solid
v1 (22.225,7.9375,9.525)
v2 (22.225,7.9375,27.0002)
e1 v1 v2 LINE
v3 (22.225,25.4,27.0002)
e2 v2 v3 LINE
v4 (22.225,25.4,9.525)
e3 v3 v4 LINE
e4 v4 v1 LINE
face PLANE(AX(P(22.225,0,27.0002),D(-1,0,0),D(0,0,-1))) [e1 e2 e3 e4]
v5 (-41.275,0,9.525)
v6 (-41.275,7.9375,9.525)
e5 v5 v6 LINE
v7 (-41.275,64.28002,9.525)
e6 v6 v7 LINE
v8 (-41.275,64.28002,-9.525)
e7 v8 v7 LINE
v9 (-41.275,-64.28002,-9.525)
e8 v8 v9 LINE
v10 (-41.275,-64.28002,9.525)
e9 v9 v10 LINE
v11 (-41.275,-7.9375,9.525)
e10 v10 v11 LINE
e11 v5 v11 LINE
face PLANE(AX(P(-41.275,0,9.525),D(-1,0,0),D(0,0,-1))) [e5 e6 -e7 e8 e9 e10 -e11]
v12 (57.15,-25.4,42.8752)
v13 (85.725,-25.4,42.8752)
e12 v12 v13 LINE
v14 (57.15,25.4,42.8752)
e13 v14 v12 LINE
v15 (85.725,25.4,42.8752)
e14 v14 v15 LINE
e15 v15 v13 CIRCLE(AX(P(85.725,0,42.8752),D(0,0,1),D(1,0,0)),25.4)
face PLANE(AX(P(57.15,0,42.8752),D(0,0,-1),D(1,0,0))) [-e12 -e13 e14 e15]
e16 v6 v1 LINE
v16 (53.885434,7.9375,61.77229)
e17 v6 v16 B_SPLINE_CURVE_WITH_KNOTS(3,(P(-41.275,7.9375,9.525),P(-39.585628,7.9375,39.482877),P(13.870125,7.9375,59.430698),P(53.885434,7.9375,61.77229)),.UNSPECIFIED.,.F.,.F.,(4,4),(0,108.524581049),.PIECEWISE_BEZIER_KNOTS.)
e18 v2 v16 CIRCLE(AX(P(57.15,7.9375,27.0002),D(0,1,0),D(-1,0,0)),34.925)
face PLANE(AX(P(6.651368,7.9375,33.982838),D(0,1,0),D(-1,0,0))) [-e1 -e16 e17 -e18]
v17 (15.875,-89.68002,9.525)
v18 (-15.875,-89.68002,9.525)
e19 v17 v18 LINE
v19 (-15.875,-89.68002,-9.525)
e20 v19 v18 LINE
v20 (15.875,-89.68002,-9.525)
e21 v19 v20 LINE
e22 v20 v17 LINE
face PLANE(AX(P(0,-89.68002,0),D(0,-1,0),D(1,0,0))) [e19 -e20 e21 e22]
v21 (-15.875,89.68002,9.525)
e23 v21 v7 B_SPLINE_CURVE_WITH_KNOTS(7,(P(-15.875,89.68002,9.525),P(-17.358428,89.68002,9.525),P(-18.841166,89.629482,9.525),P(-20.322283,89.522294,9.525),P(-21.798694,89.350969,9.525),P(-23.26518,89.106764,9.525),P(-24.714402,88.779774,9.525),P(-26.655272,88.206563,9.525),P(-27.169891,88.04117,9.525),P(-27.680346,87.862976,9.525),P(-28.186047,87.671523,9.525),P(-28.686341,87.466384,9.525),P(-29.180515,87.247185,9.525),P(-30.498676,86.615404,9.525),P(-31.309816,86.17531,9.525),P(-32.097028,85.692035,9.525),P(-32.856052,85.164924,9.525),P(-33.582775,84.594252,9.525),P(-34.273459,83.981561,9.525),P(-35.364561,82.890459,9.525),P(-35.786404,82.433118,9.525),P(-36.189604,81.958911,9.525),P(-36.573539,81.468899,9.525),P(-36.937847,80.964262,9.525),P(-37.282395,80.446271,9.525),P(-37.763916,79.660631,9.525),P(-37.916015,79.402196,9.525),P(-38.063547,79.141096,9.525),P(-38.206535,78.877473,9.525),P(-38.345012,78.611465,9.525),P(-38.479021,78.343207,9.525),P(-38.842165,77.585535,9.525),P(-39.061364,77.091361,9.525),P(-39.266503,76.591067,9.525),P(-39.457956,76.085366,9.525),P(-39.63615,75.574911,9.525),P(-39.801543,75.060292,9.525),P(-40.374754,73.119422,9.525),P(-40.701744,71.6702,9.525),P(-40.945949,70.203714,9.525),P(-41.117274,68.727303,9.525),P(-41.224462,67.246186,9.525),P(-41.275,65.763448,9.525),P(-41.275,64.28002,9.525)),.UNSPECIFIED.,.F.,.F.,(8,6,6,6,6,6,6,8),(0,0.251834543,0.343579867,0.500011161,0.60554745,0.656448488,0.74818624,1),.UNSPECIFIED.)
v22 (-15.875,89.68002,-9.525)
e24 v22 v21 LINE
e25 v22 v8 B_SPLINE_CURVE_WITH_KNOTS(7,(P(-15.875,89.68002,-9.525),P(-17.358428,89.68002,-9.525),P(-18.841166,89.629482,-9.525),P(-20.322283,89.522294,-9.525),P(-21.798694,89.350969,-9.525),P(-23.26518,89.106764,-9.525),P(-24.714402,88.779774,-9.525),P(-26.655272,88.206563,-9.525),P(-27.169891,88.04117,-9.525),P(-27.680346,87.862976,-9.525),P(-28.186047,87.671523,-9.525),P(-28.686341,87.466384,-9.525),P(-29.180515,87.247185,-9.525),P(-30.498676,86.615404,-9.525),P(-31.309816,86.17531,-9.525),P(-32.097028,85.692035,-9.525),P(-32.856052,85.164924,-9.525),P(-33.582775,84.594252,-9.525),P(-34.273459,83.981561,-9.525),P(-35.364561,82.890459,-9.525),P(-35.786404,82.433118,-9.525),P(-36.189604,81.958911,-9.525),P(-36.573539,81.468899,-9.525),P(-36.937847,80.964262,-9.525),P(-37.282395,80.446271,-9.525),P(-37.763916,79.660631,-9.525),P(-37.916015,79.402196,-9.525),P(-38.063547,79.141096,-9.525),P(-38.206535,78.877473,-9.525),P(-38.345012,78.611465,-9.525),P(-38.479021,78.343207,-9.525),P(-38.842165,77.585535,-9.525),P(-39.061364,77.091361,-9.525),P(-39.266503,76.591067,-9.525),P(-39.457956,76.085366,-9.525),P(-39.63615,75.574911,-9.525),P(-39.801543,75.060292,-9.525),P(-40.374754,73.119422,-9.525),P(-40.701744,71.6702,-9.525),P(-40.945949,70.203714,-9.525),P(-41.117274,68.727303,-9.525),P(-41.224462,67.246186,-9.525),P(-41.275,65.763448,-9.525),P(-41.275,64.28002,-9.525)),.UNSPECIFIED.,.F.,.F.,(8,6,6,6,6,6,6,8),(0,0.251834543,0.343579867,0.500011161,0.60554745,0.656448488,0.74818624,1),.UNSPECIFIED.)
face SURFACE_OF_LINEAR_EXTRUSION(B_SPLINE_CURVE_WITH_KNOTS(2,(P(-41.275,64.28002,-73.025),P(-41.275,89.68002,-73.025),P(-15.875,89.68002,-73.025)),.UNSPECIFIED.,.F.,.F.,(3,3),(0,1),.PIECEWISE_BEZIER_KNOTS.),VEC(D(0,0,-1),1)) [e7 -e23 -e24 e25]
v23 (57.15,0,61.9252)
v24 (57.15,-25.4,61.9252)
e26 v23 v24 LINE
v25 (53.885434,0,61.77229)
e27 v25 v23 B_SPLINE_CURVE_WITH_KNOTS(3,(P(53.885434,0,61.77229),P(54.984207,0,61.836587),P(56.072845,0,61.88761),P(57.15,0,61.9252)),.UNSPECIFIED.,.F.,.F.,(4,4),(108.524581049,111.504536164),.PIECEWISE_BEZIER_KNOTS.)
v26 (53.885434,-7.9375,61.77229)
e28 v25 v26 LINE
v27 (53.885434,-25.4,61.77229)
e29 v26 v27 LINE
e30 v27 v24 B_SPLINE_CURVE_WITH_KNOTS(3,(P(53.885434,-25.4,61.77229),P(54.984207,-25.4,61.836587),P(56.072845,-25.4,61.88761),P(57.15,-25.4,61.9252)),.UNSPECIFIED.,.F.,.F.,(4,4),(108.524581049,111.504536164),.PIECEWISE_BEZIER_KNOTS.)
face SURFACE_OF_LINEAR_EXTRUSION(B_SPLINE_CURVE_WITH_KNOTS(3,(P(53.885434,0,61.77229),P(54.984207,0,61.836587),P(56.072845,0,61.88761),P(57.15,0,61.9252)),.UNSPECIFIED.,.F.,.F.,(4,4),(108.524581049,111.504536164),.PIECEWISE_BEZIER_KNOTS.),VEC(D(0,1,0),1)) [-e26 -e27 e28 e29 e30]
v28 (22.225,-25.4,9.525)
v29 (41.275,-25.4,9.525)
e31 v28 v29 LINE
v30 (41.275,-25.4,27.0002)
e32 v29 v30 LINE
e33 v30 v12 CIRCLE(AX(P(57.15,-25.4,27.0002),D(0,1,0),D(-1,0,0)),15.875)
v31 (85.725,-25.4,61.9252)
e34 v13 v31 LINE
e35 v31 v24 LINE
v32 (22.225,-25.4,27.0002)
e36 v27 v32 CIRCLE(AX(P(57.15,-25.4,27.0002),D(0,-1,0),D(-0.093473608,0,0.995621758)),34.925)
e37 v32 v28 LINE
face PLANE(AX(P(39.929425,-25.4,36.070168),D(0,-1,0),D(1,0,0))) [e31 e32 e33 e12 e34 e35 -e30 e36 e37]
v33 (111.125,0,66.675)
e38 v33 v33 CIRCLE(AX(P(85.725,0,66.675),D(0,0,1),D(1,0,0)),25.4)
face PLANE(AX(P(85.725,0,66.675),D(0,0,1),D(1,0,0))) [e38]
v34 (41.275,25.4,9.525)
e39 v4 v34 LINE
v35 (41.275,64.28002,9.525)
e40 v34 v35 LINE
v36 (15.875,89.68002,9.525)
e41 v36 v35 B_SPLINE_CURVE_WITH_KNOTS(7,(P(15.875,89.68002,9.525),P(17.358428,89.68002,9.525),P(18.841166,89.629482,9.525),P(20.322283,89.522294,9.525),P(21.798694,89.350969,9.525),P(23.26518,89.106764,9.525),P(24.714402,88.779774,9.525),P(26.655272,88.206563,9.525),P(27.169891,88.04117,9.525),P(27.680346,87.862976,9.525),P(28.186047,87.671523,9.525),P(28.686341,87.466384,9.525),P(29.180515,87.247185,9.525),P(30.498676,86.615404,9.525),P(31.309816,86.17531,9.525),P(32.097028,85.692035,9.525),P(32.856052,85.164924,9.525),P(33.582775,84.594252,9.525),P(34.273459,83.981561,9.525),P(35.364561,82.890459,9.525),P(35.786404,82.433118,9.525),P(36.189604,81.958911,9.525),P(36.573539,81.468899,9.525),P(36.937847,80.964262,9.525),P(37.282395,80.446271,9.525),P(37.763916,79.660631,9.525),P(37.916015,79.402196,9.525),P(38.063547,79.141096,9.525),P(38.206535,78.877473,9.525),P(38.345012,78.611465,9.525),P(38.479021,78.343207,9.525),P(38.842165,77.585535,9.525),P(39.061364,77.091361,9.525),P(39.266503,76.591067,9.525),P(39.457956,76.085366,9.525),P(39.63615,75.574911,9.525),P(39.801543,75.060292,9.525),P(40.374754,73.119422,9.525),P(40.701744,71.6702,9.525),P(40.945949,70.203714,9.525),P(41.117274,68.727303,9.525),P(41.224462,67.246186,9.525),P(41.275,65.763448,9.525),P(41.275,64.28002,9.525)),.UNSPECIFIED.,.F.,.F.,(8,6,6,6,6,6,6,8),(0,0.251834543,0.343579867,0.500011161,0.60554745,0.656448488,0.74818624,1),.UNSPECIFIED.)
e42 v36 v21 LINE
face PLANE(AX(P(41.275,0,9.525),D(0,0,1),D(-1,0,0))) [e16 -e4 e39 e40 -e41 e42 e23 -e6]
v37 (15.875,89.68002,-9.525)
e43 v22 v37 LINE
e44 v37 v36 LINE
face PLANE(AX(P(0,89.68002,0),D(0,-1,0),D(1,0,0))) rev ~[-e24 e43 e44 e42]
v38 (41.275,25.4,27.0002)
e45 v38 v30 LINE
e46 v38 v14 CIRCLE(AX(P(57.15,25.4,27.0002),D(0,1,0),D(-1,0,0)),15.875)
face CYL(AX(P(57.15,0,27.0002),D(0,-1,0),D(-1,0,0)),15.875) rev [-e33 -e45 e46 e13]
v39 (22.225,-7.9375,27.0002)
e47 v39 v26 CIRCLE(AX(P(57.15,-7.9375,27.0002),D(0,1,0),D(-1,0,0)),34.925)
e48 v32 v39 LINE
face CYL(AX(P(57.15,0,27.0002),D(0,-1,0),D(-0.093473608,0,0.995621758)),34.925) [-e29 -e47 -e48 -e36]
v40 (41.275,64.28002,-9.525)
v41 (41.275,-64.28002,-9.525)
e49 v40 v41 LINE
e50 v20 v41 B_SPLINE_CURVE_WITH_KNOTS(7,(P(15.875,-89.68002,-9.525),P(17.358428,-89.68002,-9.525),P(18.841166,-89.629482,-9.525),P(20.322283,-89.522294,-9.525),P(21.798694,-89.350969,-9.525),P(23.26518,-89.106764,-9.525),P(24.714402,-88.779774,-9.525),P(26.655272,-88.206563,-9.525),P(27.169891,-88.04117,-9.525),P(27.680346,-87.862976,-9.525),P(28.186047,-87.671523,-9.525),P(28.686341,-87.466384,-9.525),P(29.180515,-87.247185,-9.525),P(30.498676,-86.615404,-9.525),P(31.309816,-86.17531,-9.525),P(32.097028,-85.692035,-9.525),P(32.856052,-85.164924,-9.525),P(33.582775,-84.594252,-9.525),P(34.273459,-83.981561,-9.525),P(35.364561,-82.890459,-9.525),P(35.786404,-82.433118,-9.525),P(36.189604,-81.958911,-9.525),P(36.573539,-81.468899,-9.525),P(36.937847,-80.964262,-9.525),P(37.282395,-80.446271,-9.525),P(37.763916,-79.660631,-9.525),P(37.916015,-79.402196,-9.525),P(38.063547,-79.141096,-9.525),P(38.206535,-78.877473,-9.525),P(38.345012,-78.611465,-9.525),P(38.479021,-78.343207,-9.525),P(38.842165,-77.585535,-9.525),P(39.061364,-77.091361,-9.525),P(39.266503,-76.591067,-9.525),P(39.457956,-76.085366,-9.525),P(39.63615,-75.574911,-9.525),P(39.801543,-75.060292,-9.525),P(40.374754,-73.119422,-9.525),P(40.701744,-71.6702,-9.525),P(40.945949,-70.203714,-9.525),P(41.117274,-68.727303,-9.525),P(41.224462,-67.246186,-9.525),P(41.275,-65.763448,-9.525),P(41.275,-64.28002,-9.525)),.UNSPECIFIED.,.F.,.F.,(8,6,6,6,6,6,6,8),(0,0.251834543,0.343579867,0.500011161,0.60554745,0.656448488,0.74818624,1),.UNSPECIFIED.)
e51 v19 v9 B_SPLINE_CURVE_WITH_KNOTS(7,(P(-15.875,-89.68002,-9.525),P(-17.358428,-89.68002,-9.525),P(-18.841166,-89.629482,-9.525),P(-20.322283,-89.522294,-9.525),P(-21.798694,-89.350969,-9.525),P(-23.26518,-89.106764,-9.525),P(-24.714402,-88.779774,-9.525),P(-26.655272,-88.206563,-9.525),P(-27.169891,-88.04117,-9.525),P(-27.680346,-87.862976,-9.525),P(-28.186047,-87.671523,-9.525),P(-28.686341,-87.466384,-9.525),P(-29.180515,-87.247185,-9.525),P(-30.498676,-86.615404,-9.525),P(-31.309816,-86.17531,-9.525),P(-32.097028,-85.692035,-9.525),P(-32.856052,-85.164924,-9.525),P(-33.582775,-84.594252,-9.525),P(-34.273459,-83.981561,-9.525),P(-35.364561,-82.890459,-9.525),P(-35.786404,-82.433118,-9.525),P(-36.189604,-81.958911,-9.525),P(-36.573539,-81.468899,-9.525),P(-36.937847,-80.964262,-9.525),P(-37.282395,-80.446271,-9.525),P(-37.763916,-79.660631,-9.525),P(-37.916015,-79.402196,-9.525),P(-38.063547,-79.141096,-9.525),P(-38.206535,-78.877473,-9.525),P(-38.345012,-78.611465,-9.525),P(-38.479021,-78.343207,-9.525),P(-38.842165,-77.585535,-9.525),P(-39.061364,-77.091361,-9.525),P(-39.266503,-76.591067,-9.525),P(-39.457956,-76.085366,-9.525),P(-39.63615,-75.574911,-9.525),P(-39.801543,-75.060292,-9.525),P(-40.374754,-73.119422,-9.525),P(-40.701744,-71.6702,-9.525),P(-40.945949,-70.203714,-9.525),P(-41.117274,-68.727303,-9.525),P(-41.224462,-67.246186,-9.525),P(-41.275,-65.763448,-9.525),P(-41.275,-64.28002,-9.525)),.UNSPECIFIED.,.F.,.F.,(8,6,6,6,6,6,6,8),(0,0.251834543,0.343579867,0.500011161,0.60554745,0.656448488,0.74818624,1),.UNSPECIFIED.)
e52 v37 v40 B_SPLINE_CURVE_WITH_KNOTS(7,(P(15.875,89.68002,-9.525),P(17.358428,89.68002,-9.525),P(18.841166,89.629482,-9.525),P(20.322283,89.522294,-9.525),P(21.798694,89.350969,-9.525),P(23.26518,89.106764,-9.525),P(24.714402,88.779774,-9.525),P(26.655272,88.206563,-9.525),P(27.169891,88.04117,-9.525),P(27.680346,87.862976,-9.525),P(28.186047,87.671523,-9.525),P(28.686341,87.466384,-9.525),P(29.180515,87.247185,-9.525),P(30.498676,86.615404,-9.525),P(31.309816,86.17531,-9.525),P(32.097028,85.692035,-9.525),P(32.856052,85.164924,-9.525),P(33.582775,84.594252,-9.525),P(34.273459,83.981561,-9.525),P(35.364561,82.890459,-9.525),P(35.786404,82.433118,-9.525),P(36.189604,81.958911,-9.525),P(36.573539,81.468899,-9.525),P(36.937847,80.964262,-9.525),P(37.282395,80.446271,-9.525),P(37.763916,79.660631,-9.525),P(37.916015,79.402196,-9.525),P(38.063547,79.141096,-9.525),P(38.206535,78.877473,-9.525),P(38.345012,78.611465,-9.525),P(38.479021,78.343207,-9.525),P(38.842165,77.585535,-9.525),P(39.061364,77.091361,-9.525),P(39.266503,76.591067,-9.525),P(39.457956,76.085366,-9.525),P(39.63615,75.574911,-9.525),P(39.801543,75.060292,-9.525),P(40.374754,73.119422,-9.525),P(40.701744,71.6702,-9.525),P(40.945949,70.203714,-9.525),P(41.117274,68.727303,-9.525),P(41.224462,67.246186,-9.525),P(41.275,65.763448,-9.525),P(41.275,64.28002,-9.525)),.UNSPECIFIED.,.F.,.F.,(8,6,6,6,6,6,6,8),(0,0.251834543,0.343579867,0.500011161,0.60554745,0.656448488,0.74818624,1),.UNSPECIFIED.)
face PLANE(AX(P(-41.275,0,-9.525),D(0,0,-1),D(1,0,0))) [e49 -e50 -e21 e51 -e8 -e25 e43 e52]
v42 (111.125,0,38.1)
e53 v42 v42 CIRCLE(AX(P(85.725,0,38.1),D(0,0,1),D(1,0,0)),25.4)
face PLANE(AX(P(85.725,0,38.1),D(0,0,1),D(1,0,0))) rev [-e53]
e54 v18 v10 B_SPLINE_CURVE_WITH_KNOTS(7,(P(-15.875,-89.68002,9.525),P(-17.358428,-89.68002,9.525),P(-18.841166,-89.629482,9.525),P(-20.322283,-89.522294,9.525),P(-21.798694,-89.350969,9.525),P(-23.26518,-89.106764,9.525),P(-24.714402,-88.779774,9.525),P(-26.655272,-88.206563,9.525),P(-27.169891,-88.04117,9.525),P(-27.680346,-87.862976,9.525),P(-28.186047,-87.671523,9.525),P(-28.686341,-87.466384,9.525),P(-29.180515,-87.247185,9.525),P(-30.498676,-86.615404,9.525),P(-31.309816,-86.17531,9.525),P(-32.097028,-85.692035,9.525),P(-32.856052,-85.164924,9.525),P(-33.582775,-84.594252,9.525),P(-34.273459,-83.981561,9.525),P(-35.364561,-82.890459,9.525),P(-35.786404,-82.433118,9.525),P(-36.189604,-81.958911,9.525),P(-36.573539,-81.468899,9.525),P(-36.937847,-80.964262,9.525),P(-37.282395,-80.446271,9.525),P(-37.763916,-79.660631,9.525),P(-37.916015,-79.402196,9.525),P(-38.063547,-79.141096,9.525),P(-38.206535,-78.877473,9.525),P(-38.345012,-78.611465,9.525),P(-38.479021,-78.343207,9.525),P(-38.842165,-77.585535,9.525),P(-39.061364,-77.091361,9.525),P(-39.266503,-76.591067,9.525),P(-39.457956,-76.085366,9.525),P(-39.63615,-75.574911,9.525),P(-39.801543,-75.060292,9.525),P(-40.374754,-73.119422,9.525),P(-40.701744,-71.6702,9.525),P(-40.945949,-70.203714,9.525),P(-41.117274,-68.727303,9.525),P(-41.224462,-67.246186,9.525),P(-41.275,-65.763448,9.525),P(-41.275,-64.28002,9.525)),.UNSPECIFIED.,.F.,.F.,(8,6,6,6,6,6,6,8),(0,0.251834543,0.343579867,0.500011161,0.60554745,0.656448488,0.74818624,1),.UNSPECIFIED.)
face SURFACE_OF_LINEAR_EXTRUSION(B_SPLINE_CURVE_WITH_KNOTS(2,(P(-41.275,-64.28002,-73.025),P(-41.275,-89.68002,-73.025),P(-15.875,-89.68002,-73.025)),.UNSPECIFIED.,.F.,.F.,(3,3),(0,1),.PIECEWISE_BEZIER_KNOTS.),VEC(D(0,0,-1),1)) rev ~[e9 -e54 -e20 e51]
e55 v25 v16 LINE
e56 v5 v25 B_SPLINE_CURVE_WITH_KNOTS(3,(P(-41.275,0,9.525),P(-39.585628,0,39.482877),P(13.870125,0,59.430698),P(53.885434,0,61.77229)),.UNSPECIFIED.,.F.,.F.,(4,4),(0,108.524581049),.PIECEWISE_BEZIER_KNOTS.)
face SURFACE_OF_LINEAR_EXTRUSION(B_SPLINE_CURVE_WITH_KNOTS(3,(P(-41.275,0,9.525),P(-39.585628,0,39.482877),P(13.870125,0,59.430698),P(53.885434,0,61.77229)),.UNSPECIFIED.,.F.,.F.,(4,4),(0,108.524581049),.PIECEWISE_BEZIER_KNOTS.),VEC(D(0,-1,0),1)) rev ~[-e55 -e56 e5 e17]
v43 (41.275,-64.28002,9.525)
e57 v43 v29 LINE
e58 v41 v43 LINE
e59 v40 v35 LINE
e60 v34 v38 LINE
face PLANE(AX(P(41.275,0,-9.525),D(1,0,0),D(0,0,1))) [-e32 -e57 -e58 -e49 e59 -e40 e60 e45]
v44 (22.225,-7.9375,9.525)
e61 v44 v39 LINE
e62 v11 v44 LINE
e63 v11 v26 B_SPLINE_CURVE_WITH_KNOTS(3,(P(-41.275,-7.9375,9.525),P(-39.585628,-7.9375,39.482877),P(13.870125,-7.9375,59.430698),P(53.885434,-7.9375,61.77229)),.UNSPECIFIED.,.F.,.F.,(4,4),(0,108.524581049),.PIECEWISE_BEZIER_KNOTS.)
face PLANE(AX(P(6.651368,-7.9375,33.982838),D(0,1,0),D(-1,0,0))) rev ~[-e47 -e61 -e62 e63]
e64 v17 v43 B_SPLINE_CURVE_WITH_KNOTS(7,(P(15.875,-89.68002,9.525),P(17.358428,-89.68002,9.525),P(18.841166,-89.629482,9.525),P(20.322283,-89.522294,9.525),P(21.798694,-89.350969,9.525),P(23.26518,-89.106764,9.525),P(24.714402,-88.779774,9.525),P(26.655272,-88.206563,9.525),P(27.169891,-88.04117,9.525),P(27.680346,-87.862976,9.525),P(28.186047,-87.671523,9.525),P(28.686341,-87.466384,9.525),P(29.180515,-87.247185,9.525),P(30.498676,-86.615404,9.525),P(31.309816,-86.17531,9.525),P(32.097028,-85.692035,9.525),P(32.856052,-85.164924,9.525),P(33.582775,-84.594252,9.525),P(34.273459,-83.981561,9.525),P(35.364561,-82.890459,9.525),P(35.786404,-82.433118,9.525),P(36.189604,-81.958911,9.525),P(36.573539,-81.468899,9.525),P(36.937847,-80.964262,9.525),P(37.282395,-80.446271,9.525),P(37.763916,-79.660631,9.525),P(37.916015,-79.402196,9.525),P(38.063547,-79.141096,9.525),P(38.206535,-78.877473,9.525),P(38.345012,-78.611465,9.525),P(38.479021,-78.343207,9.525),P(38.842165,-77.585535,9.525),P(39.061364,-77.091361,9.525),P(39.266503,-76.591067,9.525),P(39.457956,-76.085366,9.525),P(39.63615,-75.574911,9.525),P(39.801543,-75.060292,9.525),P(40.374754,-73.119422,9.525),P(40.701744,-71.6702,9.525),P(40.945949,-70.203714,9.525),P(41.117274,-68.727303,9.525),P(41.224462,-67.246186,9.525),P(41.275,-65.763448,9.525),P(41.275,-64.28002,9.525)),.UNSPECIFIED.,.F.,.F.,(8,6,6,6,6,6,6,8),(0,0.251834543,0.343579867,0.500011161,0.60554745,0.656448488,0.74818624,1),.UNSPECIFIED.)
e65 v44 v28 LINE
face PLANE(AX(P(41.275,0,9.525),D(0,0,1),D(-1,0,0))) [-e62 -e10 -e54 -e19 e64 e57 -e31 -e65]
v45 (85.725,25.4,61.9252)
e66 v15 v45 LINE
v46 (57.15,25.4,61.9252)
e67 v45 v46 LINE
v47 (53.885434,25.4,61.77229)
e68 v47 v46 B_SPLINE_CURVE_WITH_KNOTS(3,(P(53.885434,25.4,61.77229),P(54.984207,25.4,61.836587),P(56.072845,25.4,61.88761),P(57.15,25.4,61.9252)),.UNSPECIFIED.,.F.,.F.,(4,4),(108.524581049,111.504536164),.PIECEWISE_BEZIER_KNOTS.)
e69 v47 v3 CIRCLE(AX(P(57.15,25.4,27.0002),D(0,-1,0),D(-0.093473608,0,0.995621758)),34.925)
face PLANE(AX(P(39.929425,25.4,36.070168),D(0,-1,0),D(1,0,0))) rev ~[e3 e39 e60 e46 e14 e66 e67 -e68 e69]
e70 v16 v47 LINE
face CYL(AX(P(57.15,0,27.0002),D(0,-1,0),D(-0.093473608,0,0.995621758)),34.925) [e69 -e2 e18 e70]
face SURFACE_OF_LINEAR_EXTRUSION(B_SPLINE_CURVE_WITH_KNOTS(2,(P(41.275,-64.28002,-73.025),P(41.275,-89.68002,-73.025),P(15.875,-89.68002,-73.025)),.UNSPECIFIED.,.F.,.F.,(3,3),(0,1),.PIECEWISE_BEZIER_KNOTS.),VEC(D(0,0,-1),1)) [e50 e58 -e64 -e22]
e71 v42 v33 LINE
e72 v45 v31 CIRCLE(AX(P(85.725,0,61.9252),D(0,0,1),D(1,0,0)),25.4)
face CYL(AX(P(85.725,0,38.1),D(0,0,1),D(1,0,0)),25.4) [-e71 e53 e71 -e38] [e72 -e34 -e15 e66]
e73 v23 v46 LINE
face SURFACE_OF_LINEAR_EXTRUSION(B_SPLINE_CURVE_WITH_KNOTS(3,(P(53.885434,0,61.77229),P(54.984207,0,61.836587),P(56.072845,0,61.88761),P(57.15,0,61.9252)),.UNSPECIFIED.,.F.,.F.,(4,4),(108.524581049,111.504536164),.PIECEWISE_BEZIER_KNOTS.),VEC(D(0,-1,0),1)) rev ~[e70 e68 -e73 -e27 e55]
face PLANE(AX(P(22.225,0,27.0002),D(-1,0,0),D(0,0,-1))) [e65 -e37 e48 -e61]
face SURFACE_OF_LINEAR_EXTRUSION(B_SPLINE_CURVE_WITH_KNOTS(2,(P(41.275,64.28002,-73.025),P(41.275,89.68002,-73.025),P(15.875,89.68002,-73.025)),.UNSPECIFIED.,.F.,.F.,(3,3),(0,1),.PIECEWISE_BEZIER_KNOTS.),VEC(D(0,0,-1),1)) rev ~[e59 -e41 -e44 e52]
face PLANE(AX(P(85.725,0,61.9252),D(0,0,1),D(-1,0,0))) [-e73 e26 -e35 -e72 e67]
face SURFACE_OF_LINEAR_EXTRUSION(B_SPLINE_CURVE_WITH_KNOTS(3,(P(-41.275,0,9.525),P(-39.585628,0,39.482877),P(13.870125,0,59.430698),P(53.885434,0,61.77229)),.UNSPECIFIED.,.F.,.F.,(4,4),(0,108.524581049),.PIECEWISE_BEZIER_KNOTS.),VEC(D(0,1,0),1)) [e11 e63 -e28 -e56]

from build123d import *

# Parameters (mm, degrees)
F1_DEPTH    = 89.68002
F0_W        = 25.4
F0_H        = 19.05
F2_DEPTH    = 25.4
F3_DEPTH    = 7.9375
F5_T1_DEPTH = 146.05


# Not quite as in the source:
# - a fillet or chamfer that OpenCascade refuses, or shapes differently, is made with other operations: its cross-section is extruded or revolved along the edge and cut away or added


with BuildPart() as f1:
    # F0 (on Front) → F1 (new body, symmetric)
    with BuildSketch(Plane.XZ):
        Polygon((22.225, 9.525), (-41.275, 9.525), (-41.275, -9.525), (41.275, -9.525), (41.275, 9.525), align=None)
    extrude(amount=F1_DEPTH, both=True)

    # F0 (on Front) → F2 (join, symmetric)
    with BuildSketch(Plane.XZ):
        with BuildLine():
            Line((22.225, 27.0002), (22.225, 9.525))
            Line((22.225, 9.525), (41.275, 9.525))
            Line((41.275, 9.525), (41.275, 27.0002))
            ThreePointArc((41.275, 27.0002), (45.9246798487, 38.2255201513), (57.15, 42.8752))
            Line((57.15, 42.8752), (60.325, 42.8752))
            Line((60.325, 42.8752), (60.325, 61.9252))
            Line((60.325, 61.9252), (57.15, 61.9252))
            add(Edge.make_bspline(
                [(53.8854342407, 61.7722898912), (54.9842067368, 61.8365871986), (56.0728453275, 61.8876096574), (57.15, 61.9252)],
                knots=[108.5245810491, 108.5245810491, 108.5245810491, 108.5245810491, 111.5045361635, 111.5045361635, 111.5045361635, 111.5045361635], degree=3))
            ThreePointArc((53.8854342407, 61.7722898912), (31.3258777096, 50.5133948686), (22.225, 27.0002))
        make_face()
        with Locations((73.025, 52.4002)):
            Rectangle(F0_W, F0_H)
    extrude(amount=F2_DEPTH, both=True)

    # F0 (on Front) → F3 (join, symmetric)
    with BuildSketch(Plane.XZ):
        with BuildLine():
            add(Edge.make_bspline(
                [(-41.275, 9.525), (-39.5856284224, 39.4828766469), (13.870125209, 59.4306981306), (53.8854342407, 61.7722898912)],
                knots=[0, 0, 0, 0, 108.5245810491, 108.5245810491, 108.5245810491, 108.5245810491], degree=3))
            Line((-41.275, 9.525), (22.225, 9.525))
            Line((22.225, 9.525), (22.225, 27.0002))
            ThreePointArc((22.225, 27.0002), (31.3258777096, 50.5133948686), (53.8854342407, 61.7722898912))
        make_face()
    extrude(amount=F3_DEPTH, both=True)

    # F0 (on Front) → F4 (revolve)
    with BuildSketch(Plane.XZ):
        Polygon((85.725, 66.675), (85.725, 61.9252), (85.725, 42.8752), (85.725, 38.1), (111.125, 38.1), (111.125, 66.675), align=None)
    revolve(axis=Axis((85.725, 0, 52.3875), (0, 0, 1)))

    # F5: fillet of radius 25.4 on 4 edges, made by hand

    # F5_s2 → F5_t1 (cut)
    with BuildSketch(Plane.XY.offset(-73.025)):
        with BuildLine():
            add(Edge.make_bspline(
                [(41.275, -64.28002), (41.275, -89.68002), (15.875, -89.68002)],
                knots=[0, 0, 0, 1, 1, 1], degree=2, weights=[1, 1, 1]))
            Line((15.875, -89.68002), (41.275, -89.68002))
            Line((41.275, -89.68002), (41.275, -64.28002))
        make_face()
        with BuildLine():
            add(Edge.make_bspline(
                [(-41.275, -64.28002), (-41.275, -89.68002), (-15.875, -89.68002)],
                knots=[0, 0, 0, 1, 1, 1], degree=2, weights=[1, 1, 1]))
            Line((-15.875, -89.68002), (-41.275, -89.68002))
            Line((-41.275, -89.68002), (-41.275, -64.28002))
        make_face()
        with BuildLine():
            add(Edge.make_bspline(
                [(41.275, 64.28002), (41.275, 89.68002), (15.875, 89.68002)],
                knots=[0, 0, 0, 1, 1, 1], degree=2, weights=[1, 1, 1]))
            Line((15.875, 89.68002), (41.275, 89.68002))
            Line((41.275, 89.68002), (41.275, 64.28002))
        make_face()
        with BuildLine():
            add(Edge.make_bspline(
                [(-41.275, 64.28002), (-41.275, 89.68002), (-15.875, 89.68002)],
                knots=[0, 0, 0, 1, 1, 1], degree=2, weights=[1, 1, 1]))
            Line((-15.875, 89.68002), (-41.275, 89.68002))
            Line((-41.275, 89.68002), (-41.275, 64.28002))
        make_face()
    extrude(amount=F5_T1_DEPTH, mode=Mode.SUBTRACT)


solid = f1.part
